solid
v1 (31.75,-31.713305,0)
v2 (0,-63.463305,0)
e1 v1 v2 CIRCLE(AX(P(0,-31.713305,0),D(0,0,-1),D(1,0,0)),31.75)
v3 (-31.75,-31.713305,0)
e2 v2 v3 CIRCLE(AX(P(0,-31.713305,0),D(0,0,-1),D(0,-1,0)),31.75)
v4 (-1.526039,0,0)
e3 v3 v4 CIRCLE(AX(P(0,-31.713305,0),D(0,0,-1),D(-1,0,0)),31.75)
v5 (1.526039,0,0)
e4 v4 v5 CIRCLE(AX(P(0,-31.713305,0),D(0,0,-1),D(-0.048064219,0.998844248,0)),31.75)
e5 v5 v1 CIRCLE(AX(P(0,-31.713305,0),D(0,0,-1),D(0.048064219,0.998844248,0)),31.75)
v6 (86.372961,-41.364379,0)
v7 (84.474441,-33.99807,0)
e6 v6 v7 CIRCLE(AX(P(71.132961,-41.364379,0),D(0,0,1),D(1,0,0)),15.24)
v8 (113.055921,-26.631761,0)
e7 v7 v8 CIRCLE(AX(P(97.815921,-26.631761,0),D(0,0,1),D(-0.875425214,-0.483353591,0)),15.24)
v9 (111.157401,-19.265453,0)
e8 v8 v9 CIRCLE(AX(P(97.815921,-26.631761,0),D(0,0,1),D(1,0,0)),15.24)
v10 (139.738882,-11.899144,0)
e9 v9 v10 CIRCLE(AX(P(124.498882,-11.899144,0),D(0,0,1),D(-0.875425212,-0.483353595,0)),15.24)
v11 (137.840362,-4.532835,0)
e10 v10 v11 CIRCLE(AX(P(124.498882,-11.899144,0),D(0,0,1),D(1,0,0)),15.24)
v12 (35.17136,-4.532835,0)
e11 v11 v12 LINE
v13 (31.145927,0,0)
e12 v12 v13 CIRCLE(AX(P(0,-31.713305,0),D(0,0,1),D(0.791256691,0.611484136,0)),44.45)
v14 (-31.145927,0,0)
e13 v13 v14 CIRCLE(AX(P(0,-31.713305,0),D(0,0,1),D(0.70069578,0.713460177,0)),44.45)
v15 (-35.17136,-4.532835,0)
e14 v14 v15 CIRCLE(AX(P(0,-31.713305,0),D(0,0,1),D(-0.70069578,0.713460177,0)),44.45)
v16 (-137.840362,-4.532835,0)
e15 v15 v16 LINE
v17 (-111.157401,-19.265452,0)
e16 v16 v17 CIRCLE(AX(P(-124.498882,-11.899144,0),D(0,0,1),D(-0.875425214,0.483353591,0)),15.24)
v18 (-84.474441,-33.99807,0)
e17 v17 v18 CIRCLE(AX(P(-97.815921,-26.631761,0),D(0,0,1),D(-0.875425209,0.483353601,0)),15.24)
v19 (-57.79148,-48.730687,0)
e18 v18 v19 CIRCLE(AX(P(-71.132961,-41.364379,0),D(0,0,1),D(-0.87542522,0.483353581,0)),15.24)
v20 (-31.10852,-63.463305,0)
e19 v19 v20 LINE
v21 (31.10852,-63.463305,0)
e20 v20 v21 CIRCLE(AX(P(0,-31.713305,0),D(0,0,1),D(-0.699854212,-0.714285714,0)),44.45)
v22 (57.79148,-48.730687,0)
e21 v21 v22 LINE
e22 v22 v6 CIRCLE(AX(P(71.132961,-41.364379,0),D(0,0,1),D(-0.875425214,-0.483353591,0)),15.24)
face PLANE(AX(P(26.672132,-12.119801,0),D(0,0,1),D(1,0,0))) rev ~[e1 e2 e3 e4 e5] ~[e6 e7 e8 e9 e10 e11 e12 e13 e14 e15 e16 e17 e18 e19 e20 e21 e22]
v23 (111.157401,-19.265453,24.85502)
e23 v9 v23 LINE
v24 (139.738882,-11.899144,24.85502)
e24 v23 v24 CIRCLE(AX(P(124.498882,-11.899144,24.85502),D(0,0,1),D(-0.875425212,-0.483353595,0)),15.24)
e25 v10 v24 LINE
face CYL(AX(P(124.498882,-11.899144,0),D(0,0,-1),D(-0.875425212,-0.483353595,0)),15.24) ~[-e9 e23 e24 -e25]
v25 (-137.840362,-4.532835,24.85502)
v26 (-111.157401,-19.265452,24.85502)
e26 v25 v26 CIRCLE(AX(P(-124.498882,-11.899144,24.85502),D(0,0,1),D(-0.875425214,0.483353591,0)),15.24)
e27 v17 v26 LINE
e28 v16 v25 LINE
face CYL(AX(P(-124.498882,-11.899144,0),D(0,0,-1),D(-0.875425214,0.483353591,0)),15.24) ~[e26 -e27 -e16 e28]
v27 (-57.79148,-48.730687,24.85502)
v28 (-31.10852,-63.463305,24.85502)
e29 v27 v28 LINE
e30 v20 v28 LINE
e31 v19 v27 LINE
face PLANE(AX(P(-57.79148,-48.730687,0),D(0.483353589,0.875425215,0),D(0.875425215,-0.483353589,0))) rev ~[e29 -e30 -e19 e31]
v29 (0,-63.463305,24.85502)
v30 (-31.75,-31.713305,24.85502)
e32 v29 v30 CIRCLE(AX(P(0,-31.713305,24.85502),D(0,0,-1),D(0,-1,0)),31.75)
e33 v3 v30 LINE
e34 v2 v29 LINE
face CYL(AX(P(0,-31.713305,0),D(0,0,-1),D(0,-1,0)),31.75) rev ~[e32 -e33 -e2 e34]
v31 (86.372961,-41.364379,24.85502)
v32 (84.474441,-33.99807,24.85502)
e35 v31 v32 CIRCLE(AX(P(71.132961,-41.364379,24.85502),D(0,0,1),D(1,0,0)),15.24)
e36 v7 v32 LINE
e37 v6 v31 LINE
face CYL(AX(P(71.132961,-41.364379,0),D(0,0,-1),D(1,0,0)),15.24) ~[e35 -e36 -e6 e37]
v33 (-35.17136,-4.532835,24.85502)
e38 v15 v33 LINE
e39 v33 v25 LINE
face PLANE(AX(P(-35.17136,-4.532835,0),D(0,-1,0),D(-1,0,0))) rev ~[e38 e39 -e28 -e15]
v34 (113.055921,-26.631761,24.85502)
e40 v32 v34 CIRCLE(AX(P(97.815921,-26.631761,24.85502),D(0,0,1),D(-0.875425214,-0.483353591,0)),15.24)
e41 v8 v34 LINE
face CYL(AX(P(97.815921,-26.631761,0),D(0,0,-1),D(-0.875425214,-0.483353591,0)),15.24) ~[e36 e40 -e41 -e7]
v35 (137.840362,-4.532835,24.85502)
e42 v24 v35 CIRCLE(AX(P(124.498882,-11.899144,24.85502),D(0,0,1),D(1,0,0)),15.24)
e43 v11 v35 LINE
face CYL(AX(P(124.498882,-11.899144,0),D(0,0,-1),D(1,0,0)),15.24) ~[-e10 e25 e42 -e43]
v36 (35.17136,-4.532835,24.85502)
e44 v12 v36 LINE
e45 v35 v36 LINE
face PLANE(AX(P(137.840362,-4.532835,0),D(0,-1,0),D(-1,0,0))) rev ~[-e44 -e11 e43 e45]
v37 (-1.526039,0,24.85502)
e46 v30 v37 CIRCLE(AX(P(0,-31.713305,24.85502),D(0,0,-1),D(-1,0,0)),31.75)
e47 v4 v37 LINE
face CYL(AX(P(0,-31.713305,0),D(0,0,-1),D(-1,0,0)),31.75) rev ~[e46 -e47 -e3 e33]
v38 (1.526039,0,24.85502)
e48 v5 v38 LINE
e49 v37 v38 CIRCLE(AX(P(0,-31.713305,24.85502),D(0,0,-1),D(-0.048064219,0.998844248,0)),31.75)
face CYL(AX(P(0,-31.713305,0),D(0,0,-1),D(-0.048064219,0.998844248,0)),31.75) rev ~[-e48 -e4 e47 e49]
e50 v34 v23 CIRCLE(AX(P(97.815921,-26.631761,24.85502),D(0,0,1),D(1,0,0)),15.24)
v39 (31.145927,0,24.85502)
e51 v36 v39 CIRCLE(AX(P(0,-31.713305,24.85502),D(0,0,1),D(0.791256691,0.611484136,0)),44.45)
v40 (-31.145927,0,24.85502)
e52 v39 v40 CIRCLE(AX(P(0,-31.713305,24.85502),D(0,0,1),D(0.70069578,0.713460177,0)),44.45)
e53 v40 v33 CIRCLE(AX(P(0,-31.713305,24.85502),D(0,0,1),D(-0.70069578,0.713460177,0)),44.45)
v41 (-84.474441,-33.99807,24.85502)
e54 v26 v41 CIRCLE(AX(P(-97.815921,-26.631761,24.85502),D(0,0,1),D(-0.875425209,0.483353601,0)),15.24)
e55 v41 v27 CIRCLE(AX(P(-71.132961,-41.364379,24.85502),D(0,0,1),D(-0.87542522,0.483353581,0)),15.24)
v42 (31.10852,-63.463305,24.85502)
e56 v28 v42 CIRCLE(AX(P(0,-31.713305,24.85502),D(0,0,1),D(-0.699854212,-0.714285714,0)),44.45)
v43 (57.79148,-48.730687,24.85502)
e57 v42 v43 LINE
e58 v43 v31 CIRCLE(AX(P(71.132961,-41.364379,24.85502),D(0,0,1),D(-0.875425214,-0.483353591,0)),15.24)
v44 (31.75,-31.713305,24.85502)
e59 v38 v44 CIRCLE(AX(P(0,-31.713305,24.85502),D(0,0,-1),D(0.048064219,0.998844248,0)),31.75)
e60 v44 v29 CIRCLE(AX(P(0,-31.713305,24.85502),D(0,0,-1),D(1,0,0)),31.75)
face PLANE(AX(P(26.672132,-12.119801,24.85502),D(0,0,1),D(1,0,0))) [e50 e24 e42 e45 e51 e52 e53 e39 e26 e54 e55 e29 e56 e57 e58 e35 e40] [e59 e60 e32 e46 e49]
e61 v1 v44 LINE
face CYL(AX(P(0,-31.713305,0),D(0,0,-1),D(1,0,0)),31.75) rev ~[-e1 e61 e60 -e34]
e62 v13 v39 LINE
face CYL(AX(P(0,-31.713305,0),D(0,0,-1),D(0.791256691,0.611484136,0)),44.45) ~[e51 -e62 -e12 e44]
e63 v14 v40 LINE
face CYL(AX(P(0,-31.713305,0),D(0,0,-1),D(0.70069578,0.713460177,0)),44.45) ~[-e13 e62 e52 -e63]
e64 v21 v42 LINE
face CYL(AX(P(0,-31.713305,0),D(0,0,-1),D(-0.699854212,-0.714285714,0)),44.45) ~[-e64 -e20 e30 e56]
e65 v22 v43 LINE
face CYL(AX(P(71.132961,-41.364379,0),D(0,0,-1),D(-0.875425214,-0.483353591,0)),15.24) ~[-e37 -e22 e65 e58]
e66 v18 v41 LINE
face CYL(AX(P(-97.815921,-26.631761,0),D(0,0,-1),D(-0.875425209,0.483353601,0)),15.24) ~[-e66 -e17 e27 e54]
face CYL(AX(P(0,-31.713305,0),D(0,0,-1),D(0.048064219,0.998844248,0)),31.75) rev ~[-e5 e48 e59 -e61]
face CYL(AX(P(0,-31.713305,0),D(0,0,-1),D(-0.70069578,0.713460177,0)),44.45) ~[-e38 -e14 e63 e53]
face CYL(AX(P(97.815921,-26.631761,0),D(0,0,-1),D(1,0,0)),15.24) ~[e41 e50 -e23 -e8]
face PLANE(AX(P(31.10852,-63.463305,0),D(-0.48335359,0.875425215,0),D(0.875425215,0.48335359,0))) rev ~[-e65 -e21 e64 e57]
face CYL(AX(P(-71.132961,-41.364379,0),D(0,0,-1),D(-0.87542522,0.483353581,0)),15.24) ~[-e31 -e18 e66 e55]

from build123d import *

# Parameters (mm, degrees)
F1_DEPTH = 24.85502


# Not quite as in the source:
# - ends of sketch curves that miss each other by under 0.0002 mm in the source are joined


with BuildPart() as f1:
    # F0 (on Top) → F1 (new body)
    with BuildSketch(Plane.XY):
        with BuildLine():
            Line((31.75, -31.7133048595), (44.45, -31.7133048595))
            ThreePointArc((44.45, -31.7133048595), (42.0664322772, -17.3530202013), (35.171359934, -4.5328350256))
            ThreePointArc((35.171359934, -4.5328350256), (33.2360090694, -2.1977123508), (31.1459274206, 0))
            Line((31.1459274206, 0), (1.526038953, 0))
            ThreePointArc((1.526038953, 0), (22.9838447258, -9.8088445461), (31.75, -31.7133048595))
        make_face()
        with BuildLine():
            Line((44.45, -40.8569961303), (44.45, -31.7133048595))
            ThreePointArc((44.45, -31.7133048595), (44.2101126583, -36.3250766164), (43.4930398768, -40.8870708405))
            ThreePointArc((43.4930398768, -40.8870708405), (43.9712837047, -40.8645166634), (44.45, -40.8569961303))
        make_face()
        with BuildLine():
            ThreePointArc((43.4930398768, -40.8870708405), (44.2101126583, -36.3250766164), (44.45, -31.7133048595))
            Line((44.45, -31.7133048595), (31.75, -31.7133048595))
            ThreePointArc((31.75, -31.7133048595), (22.4506403027, -54.1639451622), (0, -63.4633048595))
            Line((0, -63.4633048595), (31.1085197333, -63.4633048595))
            ThreePointArc((31.1085197333, -63.4633048595), (31.0883782789, -48.7672850184), (43.4930398768, -40.8870708405))
        make_face()
        with BuildLine():
            ThreePointArc((35.171359934, -4.5328350256), (42.0664322772, -17.3530202013), (44.45, -31.7133048595))
            Line((44.45, -31.7133048595), (44.45, -4.5328350256))
            Line((44.45, -4.5328350256), (35.171359934, -4.5328350256))
        make_face()
        with BuildLine():
            Line((44.45, -4.5328350256), (44.45, -31.7133048595))
            Line((44.45, -31.7133048595), (44.45, -40.8569961303))
            ThreePointArc((44.45, -40.8569961303), (52.1958071052, -42.9722076639), (57.7914802832, -48.730687431))
            ThreePointArc((57.7914802832, -48.730687431), (63.7666518684, -28.0228983697), (84.4744408875, -33.9980701011))
            ThreePointArc((84.4744408875, -33.9980701011), (90.4496122897, -13.290280973), (111.1574013682, -19.2654525473))
            ThreePointArc((111.1574013682, -19.2654525473), (109.2588815999, -11.8991437909), (111.1574013333, -4.5328350256))
            Line((111.1574013333, -4.5328350256), (44.45, -4.5328350256))
        make_face()
        with BuildLine():
            ThreePointArc((44.45, -40.8569961303), (43.9712837047, -40.8645166634), (43.4930398768, -40.8870708405))
            ThreePointArc((43.4930398768, -40.8870708405), (38.9713966864, -53.0916289358), (31.1085197333, -63.4633048595))
            Line((31.1085197333, -63.4633048595), (44.45, -56.0969961303))
            Line((44.45, -56.0969961303), (44.45, -40.8569961303))
        make_face()
        with BuildLine():
            ThreePointArc((31.1085197333, -63.4633048595), (38.9713966864, -53.0916289358), (43.4930398768, -40.8870708405))
            ThreePointArc((43.4930398768, -40.8870708405), (31.0883782789, -48.7672850184), (31.1085197333, -63.4633048595))
        make_face()
        with BuildLine():
            ThreePointArc((57.7914802832, -48.730687431), (52.1958071052, -42.9722076639), (44.45, -40.8569961303))
            Line((44.45, -40.8569961303), (44.45, -56.0969961303))
            Line((44.45, -56.0969961303), (57.7914802667, -48.7306874011))
        make_face()
        with BuildLine():
            Line((1.526038953, 0), (31.1459274206, 0))
            ThreePointArc((31.1459274206, 0), (0, 12.7366951405), (-31.1459274206, 0))
            Line((-31.1459274206, 0), (-1.526038953, 0))
            ThreePointArc((-1.526038953, 0), (0, 0.0366951405), (1.526038953, 0))
        make_face()
        with BuildLine():
            ThreePointArc((-31.1085197333, -63.4633048595), (0, -76.1633048595), (31.1085197333, -63.4633048595))
            Line((31.1085197333, -63.4633048595), (0, -63.4633048595))
            Line((0, -63.4633048595), (-31.1085197333, -63.4633048595))
        make_face()
        with BuildLine():
            Line((-31.1085197333, -63.4633048595), (0, -63.4633048595))
            ThreePointArc((0, -63.4633048595), (-22.4506403027, -54.1639451622), (-31.75, -31.7133048595))
            Line((-31.75, -31.7133048595), (-44.45, -31.7133048595))
            ThreePointArc((-44.45, -31.7133048595), (-44.2101126583, -36.3250766164), (-43.4930398768, -40.8870708405))
            ThreePointArc((-43.4930398768, -40.8870708405), (-33.340506936, -45.6645101437), (-29.21, -56.0969961303))
            ThreePointArc((-29.21, -56.0969961303), (-29.6922603481, -59.9005103432), (-31.1085197333, -63.4633048595))
        make_face()
        with BuildLine():
            Line((137.8403618666, -4.5328350256), (111.1574013333, -4.5328350256))
            ThreePointArc((111.1574013333, -4.5328350256), (109.2588815999, -11.8991437909), (111.1574013682, -19.2654525473))
            Line((111.1574013333, -19.2654524841), (137.8403618666, -4.5328350256))
        make_face()
        with BuildLine():
            ThreePointArc((84.4744408875, -33.9980701011), (63.7666518684, -28.0228983697), (57.7914802832, -48.730687431))
            Line((57.7914802832, -48.730687431), (84.4744408875, -33.9980701011))
        make_face()
        with BuildLine():
            Line((84.4744408, -33.9980699426), (57.7914802667, -48.7306874011))
            ThreePointArc((57.7914802667, -48.7306874011), (74.9364747628, -56.1221183194), (86.3729605333, -41.3643786718))
            ThreePointArc((86.3729605333, -41.3643786718), (85.8907002078, -37.5608645466), (84.4744408, -33.9980699426))
        make_face()
        with BuildLine():
            Line((-1.526038953, 0), (-31.1459274206, 0))
            ThreePointArc((-31.1459274206, 0), (-33.2360090694, -2.1977123508), (-35.171359934, -4.5328350256))
            ThreePointArc((-35.171359934, -4.5328350256), (-42.0664322772, -17.3530202013), (-44.45, -31.7133048595))
            Line((-44.45, -31.7133048595), (-31.75, -31.7133048595))
            ThreePointArc((-31.75, -31.7133048595), (-22.9838447258, -9.8088445461), (-1.526038953, 0))
        make_face()
        with BuildLine():
            Line((-44.45, -56.0969961303), (-31.1085197333, -63.4633048595))
            ThreePointArc((-31.1085197333, -63.4633048595), (-38.9713966864, -53.0916289358), (-43.4930398768, -40.8870708405))
            ThreePointArc((-43.4930398768, -40.8870708405), (-43.9712837047, -40.8645166634), (-44.45, -40.8569961303))
            Line((-44.45, -40.8569961303), (-44.45, -56.0969961303))
        make_face()
        with BuildLine():
            ThreePointArc((-43.4930398768, -40.8870708405), (-38.9713966864, -53.0916289358), (-31.1085197333, -63.4633048595))
            ThreePointArc((-31.1085197333, -63.4633048595), (-29.6922603481, -59.9005103432), (-29.21, -56.0969961303))
            ThreePointArc((-29.21, -56.0969961303), (-33.340506936, -45.6645101437), (-43.4930398768, -40.8870708405))
        make_face()
        with BuildLine():
            ThreePointArc((113.0559210666, -26.6317612133), (112.5736607275, -22.8282470353), (111.1574013682, -19.2654525473))
            Line((111.1574013682, -19.2654525473), (84.4744408, -33.9980699426))
            ThreePointArc((84.4744408, -33.9980699426), (101.6194353672, -41.3895008426), (113.0559210666, -26.6317612133))
        make_face()
        with BuildLine():
            Line((84.4744408, -33.9980699426), (111.1574013333, -19.2654524841))
            ThreePointArc((111.1574013333, -19.2654524841), (90.4496122897, -13.290280973), (84.4744408, -33.9980699426))
        make_face()
        with BuildLine():
            Line((137.8403618666, -4.5328350256), (111.1574013333, -19.2654524841))
            ThreePointArc((111.1574013682, -19.2654525473), (128.3023958478, -26.6568833977), (139.7388815999, -11.8991437549))
            ThreePointArc((139.7388815999, -11.8991437549), (139.2566212518, -8.0956295419), (137.8403618666, -4.5328350256))
        make_face()
        with BuildLine():
            ThreePointArc((-44.45, -31.7133048595), (-42.0664322772, -17.3530202013), (-35.171359934, -4.5328350256))
            Line((-35.171359934, -4.5328350256), (-111.1574013333, -4.5328350256))
            ThreePointArc((-111.1574013333, -4.5328350256), (-109.7411419481, -8.0956295419), (-109.2588815999, -11.8991437548))
            ThreePointArc((-109.2588815999, -11.8991437548), (-109.7411419274, -15.7026578875), (-111.1574012531, -19.265452339))
            ThreePointArc((-111.1574012531, -19.265452339), (-94.0124067734, -11.8740215822), (-82.5759210666, -26.6317612133))
            ThreePointArc((-82.5759210666, -26.6317612133), (-83.058181437, -30.4352755127), (-84.4744408863, -33.9980700989))
            ThreePointArc((-84.4744408863, -33.9980700989), (-67.3294464068, -26.6066389977), (-55.8929605333, -41.3643786718))
            ThreePointArc((-55.8929605333, -41.3643786718), (-56.3752208889, -45.1678929135), (-57.7914802953, -48.730687453))
            ThreePointArc((-57.7914802953, -48.730687453), (-52.1958071161, -42.9722076703), (-44.45, -40.8569961303))
            Line((-44.45, -40.8569961303), (-44.45, -31.7133048595))
        make_face()
        with BuildLine():
            ThreePointArc((-44.45, -40.8569961303), (-43.9712837047, -40.8645166634), (-43.4930398768, -40.8870708405))
            ThreePointArc((-43.4930398768, -40.8870708405), (-44.2101126583, -36.3250766164), (-44.45, -31.7133048595))
            Line((-44.45, -31.7133048595), (-44.45, -40.8569961303))
        make_face()
        with BuildLine():
            Line((-57.7914802667, -48.7306874011), (-44.45, -56.0969961303))
            Line((-44.45, -56.0969961303), (-44.45, -40.8569961303))
            ThreePointArc((-44.45, -40.8569961303), (-52.1958071161, -42.9722076703), (-57.7914802953, -48.730687453))
        make_face()
        with BuildLine():
            ThreePointArc((-84.4744408863, -33.9980700989), (-78.4992692104, -54.7058589673), (-57.7914802953, -48.730687453))
            Line((-57.7914802953, -48.730687453), (-84.4744408863, -33.9980700989))
        make_face()
        with BuildLine():
            Line((-84.4744408, -33.9980699426), (-57.7914802667, -48.7306874011))
            ThreePointArc((-57.7914802667, -48.7306874011), (-56.3752208889, -45.1678929135), (-55.8929605333, -41.3643786718))
            ThreePointArc((-55.8929605333, -41.3643786718), (-67.3294464068, -26.6066389977), (-84.4744408, -33.9980699426))
        make_face()
        with BuildLine():
            ThreePointArc((-109.2588815999, -11.8991437548), (-109.7411419481, -8.0956295419), (-111.1574013333, -4.5328350256))
            Line((-111.1574013333, -4.5328350256), (-137.8403618666, -4.5328350256))
            Line((-137.8403618666, -4.5328350256), (-111.1574013333, -19.2654524841))
            ThreePointArc((-111.1574013333, -19.2654524841), (-109.7411419274, -15.7026578875), (-109.2588815999, -11.8991437548))
        make_face()
        with BuildLine():
            ThreePointArc((-111.1574012531, -19.265452339), (-105.1822299466, -39.9732413968), (-84.4744408863, -33.9980700989))
            Line((-84.4744408863, -33.9980700989), (-111.1574012531, -19.265452339))
        make_face()
        with BuildLine():
            Line((-111.1574013333, -19.2654524841), (-84.4744408, -33.9980699426))
            ThreePointArc((-84.4744408, -33.9980699426), (-83.058181437, -30.4352755127), (-82.5759210666, -26.6317612133))
            ThreePointArc((-82.5759210666, -26.6317612133), (-94.0124067734, -11.8740215822), (-111.1574013333, -19.2654524841))
        make_face()
        with BuildLine():
            Line((-111.1574013333, -19.2654524841), (-137.8403618666, -4.5328350256))
            ThreePointArc((-137.8403618666, -4.5328350256), (-131.8651902566, -25.2406240616), (-111.1574013333, -19.2654524841))
        make_face()
    extrude(amount=F1_DEPTH)


solid = f1.part
